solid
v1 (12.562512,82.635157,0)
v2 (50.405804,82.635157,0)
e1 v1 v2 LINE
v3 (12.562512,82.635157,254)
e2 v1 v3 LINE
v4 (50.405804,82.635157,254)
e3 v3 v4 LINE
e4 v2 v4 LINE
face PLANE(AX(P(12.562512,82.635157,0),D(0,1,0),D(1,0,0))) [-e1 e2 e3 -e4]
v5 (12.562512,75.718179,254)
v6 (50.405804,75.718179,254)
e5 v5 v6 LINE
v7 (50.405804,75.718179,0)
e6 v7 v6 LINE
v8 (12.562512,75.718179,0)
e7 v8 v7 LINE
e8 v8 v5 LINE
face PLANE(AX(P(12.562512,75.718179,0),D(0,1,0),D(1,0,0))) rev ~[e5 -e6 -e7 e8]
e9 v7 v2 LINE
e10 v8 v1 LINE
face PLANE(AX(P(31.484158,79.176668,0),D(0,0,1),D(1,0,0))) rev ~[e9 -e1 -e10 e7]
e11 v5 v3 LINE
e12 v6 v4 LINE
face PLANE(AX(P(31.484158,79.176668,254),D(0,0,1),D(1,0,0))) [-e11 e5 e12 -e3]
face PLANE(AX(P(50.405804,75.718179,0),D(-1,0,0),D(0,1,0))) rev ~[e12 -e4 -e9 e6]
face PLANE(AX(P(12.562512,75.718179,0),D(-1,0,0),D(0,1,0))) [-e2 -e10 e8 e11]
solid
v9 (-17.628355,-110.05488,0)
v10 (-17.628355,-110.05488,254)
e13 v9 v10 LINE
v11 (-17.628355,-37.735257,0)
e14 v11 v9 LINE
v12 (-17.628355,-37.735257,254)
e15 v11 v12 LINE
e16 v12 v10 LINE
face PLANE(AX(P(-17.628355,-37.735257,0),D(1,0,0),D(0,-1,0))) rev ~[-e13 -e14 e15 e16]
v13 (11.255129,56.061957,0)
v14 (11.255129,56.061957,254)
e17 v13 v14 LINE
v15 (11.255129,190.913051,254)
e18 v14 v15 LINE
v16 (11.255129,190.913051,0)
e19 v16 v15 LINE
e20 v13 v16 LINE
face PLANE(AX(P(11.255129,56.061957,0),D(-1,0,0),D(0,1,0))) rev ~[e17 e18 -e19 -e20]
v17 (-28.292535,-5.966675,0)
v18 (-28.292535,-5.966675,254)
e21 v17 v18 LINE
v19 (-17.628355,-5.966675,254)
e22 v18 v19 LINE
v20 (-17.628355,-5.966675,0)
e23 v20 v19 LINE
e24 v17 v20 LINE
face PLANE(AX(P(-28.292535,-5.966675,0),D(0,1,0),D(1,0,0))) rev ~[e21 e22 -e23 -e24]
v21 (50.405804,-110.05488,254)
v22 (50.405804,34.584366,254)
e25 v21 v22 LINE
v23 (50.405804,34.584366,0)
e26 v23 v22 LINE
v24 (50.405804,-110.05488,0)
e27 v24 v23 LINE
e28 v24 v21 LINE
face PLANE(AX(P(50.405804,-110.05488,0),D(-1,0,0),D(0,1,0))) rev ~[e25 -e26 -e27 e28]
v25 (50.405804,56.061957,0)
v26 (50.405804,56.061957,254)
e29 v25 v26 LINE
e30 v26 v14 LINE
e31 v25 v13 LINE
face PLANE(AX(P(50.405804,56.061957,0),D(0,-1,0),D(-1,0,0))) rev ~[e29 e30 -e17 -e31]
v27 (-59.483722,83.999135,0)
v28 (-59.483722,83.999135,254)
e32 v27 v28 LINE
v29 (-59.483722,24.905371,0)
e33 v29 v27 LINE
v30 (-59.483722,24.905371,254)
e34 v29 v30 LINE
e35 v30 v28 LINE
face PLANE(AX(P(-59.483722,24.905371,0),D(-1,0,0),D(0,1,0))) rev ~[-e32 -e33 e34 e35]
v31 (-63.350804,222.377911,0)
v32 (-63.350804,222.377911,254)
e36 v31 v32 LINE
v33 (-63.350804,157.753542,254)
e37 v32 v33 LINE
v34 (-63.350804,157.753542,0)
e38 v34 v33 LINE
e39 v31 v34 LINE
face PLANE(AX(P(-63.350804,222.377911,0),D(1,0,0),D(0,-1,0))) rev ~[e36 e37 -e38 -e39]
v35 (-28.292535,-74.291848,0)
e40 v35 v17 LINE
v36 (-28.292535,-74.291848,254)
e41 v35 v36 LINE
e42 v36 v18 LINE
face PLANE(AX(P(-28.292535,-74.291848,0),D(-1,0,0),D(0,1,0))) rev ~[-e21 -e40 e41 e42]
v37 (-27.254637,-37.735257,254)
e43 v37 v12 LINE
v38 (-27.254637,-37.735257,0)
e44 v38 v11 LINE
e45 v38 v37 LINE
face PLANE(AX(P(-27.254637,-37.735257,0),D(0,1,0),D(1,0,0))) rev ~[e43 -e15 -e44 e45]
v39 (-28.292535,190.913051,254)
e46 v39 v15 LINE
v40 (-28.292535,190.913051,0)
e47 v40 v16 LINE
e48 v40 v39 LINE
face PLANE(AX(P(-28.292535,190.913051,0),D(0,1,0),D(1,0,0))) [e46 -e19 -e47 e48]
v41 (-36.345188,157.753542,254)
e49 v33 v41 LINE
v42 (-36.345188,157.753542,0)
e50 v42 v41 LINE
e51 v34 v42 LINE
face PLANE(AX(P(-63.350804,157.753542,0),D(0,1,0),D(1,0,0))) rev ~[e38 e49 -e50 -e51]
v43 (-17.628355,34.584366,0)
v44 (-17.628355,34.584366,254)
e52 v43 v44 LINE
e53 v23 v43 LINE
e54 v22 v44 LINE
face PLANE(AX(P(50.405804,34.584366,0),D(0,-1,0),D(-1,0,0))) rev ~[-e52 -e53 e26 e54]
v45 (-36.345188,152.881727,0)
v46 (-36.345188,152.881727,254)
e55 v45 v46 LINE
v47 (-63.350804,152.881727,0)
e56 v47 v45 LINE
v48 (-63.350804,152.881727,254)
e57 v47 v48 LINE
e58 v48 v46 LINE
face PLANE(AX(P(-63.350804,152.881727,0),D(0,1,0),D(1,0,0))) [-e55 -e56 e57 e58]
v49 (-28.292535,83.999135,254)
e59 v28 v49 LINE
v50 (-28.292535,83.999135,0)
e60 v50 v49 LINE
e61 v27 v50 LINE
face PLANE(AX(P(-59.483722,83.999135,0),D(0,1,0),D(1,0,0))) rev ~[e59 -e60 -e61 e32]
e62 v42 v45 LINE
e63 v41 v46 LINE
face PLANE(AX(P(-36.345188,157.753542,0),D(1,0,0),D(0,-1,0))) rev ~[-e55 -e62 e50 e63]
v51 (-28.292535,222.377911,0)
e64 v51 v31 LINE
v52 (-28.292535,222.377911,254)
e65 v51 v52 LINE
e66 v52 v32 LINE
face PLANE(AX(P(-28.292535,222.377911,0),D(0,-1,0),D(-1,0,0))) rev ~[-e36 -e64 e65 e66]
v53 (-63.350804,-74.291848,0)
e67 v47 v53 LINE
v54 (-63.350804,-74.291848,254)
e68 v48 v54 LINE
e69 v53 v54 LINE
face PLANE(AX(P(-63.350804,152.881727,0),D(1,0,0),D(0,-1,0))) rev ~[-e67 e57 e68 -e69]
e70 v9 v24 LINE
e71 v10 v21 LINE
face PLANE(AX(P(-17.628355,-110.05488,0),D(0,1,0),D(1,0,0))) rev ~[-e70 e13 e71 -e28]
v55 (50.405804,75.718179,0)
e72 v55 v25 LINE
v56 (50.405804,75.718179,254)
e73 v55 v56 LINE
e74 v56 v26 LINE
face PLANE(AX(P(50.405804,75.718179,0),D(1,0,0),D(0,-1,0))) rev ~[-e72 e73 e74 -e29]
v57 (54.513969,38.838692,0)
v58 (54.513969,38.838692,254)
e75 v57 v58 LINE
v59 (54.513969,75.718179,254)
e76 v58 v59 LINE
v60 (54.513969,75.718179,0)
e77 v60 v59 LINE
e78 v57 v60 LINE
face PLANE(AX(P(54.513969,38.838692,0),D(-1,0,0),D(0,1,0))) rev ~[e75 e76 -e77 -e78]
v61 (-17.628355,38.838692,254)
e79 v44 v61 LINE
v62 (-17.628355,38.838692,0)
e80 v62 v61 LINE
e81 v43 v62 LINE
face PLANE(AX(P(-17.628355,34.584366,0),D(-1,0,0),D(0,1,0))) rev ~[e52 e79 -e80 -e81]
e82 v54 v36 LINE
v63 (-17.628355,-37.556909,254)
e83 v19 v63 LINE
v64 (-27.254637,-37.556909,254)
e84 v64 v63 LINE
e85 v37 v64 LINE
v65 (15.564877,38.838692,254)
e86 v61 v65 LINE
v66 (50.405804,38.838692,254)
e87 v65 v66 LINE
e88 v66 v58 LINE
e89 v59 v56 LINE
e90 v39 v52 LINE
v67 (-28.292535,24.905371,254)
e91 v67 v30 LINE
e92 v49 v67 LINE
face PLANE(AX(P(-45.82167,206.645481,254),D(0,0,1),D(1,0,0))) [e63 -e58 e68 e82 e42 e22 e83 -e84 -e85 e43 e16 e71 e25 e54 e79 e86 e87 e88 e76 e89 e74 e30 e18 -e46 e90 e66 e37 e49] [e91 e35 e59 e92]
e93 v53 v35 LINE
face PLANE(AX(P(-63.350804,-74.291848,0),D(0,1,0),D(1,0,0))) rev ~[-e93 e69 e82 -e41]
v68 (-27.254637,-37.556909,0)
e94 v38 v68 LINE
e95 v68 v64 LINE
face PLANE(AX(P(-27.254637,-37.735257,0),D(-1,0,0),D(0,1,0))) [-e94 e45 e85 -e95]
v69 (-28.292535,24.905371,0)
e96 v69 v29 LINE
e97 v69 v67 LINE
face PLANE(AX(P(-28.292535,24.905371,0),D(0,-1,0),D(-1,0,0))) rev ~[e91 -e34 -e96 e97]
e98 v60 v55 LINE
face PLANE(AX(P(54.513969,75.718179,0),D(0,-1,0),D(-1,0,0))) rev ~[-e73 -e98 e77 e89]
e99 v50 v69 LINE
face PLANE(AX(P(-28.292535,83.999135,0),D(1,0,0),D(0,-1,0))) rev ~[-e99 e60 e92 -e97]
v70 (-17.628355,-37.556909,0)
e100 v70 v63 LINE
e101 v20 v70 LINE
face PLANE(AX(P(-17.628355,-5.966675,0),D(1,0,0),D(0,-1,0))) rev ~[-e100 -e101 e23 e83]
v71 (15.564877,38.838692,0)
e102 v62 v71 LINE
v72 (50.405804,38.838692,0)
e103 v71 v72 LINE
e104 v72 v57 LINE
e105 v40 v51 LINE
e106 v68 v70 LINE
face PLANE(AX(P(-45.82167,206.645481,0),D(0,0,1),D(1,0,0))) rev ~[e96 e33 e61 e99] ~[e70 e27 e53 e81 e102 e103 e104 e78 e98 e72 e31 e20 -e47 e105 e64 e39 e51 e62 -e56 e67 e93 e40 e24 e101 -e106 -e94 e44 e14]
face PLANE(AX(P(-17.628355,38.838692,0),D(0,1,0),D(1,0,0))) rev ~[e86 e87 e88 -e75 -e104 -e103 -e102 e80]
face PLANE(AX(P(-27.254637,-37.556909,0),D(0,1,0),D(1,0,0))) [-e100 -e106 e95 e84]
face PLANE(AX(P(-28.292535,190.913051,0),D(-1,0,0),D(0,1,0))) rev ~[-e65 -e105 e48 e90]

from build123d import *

# Parameters (mm, degrees)
F0_W     = 37.8432916477
F0_H     = 6.9169774652
F1_DEPTH = 254
F0_W_2   = 4.0263263509
F0_H_2   = 33.1595093012
F0_W_3   = 39.5476641133
F0_H_3   = 73.7544074655
F0_W_4   = 27.0056165755
F0_H_4   = 32.0053882897
F0_W_5   = 10.6641799212
F0_H_5   = 17.223265022
F0_W_6   = 34.8409274593
F0_W_7   = 3.8670822978
F0_H_6   = 1.6715824604
F0_H_7   = 30.8720460162
F0_W_8   = 0.7546879351
F0_H_8   = 30.3376843221
F0_W_9   = 9.626282379
F0_H_9   = 0.178348273


with BuildPart() as f1:
    # F0 (on Top) → F1 (new body)
    with BuildSketch(Plane.XY):
        with Locations((31.484158244, 79.1766680777)):
            Rectangle(F0_W, F0_H)
    extrude(amount=F1_DEPTH)


with BuildPart() as f1b:
    # F0 (on Top) → F1, piece 2 (new body)
    with BuildSketch(Plane.XY):
        Polygon((-28.2925348729, 222.3779112101), (-63.3508041501, 222.3779112101), (-63.3508041501, 190.9130513668), (-32.3188612238, 190.9130513668), (-28.2925348729, 190.9130513668), align=None)
        Polygon((-32.3188612238, 190.9130513668), (-63.3508041501, 190.9130513668), (-63.3508041501, 157.7535420656), (-36.3451875746, 157.7535420656), (-32.3188612238, 157.7535420656), align=None)
        with Locations((-30.3056980483, 174.3332967162)):
            Rectangle(F0_W_2, F0_H_2)
        with Locations((-8.5187028162, 174.3332967162)):
            Rectangle(F0_W_3, F0_H_2)
        Polygon((-28.2925348729, 83.9991346002), (-28.2925348729, 157.7535420656), (-32.3188612238, 157.7535420656), (-36.3451875746, 157.7535420656), (-36.3451875746, 152.8817266226), (-36.3451875746, 120.8763383329), (-36.3451875746, 83.9991346002), (-35.1700671017, 83.9991346002), (-30.1514100283, 83.9991346002), align=None)
        with Locations((-8.5187028162, 120.8763383329)):
            Rectangle(F0_W_3, F0_H_3)
        Polygon((11.2551292405, 83.9991346002), (-28.2925348729, 83.9991346002), (-28.2925348729, 82.3275521398), (-28.2925348729, 56.0619570315), (-17.6283549517, 56.0619570315), (11.2551292405, 56.0619570315), align=None)
        with Locations((-49.8479958624, 136.8790324777)):
            Rectangle(F0_W_4, F0_H_4)
        Polygon((-36.3451875746, 83.9991346002), (-36.3451875746, 120.8763383329), (-63.3508041501, 120.8763383329), (-63.3508041501, 83.9991346002), (-59.4837218523, 83.9991346002), align=None)
        Polygon((15.5648766086, 56.0619570315), (11.2551292405, 56.0619570315), (-17.6283549517, 56.0619570315), (-17.6283549517, 38.8386920094), (15.5648766086, 38.8386920094), align=None)
        with Locations((-22.9604449123, 47.4503245205)):
            Rectangle(F0_W_5, F0_H_5)
        with Locations((32.9853403382, 47.4503245205)):
            Rectangle(F0_W_6, F0_H_5)
        Polygon((-17.6283549517, 38.8386920094), (-28.2925348729, 38.8386920094), (-28.2925348729, 24.9053705484), (-17.6283549517, 24.9053705484), (-17.6283549517, 34.5843657851), align=None)
        with Locations((-61.4172630012, 83.16334337)):
            Rectangle(F0_W_7, F0_H_6)
        Polygon((50.4058040679, 75.7181793451), (50.4058040679, 56.0619570315), (50.4058040679, 38.8386920094), (54.5139685273, 38.8386920094), (54.5139685273, 75.7181793451), align=None)
        Polygon((-59.4837218523, 56.0619570315), (-59.4837218523, 82.3275521398), (-63.3508041501, 82.3275521398), (-63.3508041501, -74.2918476462), (-28.2925348729, -74.2918476462), (-28.2925348729, -37.5569090247), (-29.047222808, -37.5569090247), (-29.047222808, -7.2192247026), (-28.2925348729, -7.2192247026), (-28.2925348729, -5.9666754678), (-28.2925348729, 24.9053705484), (-48.5863350332, 24.9053705484), (-59.4837218523, 24.9053705484), align=None)
        with Locations((-22.9604449123, 9.4693475403)):
            Rectangle(F0_W_5, F0_H_7)
        Polygon((50.4058040679, 34.5843657851), (-17.6283549517, 34.5843657851), (-17.6283549517, 24.9053705484), (-17.6283549517, -5.9666754678), (-17.6283549517, -37.5569090247), (-17.6283549517, -37.7352572978), (-17.6283549517, -110.0548803806), (50.4058040679, -110.0548803806), align=None)
        with Locations((-28.6698788404, -22.3880668636)):
            Rectangle(F0_W_8, F0_H_8)
        with Locations((-22.4414961413, -37.6460831612)):
            Rectangle(F0_W_9, F0_H_9)
    extrude(amount=F1_DEPTH)


solid = Compound([f1.part, f1b.part])
